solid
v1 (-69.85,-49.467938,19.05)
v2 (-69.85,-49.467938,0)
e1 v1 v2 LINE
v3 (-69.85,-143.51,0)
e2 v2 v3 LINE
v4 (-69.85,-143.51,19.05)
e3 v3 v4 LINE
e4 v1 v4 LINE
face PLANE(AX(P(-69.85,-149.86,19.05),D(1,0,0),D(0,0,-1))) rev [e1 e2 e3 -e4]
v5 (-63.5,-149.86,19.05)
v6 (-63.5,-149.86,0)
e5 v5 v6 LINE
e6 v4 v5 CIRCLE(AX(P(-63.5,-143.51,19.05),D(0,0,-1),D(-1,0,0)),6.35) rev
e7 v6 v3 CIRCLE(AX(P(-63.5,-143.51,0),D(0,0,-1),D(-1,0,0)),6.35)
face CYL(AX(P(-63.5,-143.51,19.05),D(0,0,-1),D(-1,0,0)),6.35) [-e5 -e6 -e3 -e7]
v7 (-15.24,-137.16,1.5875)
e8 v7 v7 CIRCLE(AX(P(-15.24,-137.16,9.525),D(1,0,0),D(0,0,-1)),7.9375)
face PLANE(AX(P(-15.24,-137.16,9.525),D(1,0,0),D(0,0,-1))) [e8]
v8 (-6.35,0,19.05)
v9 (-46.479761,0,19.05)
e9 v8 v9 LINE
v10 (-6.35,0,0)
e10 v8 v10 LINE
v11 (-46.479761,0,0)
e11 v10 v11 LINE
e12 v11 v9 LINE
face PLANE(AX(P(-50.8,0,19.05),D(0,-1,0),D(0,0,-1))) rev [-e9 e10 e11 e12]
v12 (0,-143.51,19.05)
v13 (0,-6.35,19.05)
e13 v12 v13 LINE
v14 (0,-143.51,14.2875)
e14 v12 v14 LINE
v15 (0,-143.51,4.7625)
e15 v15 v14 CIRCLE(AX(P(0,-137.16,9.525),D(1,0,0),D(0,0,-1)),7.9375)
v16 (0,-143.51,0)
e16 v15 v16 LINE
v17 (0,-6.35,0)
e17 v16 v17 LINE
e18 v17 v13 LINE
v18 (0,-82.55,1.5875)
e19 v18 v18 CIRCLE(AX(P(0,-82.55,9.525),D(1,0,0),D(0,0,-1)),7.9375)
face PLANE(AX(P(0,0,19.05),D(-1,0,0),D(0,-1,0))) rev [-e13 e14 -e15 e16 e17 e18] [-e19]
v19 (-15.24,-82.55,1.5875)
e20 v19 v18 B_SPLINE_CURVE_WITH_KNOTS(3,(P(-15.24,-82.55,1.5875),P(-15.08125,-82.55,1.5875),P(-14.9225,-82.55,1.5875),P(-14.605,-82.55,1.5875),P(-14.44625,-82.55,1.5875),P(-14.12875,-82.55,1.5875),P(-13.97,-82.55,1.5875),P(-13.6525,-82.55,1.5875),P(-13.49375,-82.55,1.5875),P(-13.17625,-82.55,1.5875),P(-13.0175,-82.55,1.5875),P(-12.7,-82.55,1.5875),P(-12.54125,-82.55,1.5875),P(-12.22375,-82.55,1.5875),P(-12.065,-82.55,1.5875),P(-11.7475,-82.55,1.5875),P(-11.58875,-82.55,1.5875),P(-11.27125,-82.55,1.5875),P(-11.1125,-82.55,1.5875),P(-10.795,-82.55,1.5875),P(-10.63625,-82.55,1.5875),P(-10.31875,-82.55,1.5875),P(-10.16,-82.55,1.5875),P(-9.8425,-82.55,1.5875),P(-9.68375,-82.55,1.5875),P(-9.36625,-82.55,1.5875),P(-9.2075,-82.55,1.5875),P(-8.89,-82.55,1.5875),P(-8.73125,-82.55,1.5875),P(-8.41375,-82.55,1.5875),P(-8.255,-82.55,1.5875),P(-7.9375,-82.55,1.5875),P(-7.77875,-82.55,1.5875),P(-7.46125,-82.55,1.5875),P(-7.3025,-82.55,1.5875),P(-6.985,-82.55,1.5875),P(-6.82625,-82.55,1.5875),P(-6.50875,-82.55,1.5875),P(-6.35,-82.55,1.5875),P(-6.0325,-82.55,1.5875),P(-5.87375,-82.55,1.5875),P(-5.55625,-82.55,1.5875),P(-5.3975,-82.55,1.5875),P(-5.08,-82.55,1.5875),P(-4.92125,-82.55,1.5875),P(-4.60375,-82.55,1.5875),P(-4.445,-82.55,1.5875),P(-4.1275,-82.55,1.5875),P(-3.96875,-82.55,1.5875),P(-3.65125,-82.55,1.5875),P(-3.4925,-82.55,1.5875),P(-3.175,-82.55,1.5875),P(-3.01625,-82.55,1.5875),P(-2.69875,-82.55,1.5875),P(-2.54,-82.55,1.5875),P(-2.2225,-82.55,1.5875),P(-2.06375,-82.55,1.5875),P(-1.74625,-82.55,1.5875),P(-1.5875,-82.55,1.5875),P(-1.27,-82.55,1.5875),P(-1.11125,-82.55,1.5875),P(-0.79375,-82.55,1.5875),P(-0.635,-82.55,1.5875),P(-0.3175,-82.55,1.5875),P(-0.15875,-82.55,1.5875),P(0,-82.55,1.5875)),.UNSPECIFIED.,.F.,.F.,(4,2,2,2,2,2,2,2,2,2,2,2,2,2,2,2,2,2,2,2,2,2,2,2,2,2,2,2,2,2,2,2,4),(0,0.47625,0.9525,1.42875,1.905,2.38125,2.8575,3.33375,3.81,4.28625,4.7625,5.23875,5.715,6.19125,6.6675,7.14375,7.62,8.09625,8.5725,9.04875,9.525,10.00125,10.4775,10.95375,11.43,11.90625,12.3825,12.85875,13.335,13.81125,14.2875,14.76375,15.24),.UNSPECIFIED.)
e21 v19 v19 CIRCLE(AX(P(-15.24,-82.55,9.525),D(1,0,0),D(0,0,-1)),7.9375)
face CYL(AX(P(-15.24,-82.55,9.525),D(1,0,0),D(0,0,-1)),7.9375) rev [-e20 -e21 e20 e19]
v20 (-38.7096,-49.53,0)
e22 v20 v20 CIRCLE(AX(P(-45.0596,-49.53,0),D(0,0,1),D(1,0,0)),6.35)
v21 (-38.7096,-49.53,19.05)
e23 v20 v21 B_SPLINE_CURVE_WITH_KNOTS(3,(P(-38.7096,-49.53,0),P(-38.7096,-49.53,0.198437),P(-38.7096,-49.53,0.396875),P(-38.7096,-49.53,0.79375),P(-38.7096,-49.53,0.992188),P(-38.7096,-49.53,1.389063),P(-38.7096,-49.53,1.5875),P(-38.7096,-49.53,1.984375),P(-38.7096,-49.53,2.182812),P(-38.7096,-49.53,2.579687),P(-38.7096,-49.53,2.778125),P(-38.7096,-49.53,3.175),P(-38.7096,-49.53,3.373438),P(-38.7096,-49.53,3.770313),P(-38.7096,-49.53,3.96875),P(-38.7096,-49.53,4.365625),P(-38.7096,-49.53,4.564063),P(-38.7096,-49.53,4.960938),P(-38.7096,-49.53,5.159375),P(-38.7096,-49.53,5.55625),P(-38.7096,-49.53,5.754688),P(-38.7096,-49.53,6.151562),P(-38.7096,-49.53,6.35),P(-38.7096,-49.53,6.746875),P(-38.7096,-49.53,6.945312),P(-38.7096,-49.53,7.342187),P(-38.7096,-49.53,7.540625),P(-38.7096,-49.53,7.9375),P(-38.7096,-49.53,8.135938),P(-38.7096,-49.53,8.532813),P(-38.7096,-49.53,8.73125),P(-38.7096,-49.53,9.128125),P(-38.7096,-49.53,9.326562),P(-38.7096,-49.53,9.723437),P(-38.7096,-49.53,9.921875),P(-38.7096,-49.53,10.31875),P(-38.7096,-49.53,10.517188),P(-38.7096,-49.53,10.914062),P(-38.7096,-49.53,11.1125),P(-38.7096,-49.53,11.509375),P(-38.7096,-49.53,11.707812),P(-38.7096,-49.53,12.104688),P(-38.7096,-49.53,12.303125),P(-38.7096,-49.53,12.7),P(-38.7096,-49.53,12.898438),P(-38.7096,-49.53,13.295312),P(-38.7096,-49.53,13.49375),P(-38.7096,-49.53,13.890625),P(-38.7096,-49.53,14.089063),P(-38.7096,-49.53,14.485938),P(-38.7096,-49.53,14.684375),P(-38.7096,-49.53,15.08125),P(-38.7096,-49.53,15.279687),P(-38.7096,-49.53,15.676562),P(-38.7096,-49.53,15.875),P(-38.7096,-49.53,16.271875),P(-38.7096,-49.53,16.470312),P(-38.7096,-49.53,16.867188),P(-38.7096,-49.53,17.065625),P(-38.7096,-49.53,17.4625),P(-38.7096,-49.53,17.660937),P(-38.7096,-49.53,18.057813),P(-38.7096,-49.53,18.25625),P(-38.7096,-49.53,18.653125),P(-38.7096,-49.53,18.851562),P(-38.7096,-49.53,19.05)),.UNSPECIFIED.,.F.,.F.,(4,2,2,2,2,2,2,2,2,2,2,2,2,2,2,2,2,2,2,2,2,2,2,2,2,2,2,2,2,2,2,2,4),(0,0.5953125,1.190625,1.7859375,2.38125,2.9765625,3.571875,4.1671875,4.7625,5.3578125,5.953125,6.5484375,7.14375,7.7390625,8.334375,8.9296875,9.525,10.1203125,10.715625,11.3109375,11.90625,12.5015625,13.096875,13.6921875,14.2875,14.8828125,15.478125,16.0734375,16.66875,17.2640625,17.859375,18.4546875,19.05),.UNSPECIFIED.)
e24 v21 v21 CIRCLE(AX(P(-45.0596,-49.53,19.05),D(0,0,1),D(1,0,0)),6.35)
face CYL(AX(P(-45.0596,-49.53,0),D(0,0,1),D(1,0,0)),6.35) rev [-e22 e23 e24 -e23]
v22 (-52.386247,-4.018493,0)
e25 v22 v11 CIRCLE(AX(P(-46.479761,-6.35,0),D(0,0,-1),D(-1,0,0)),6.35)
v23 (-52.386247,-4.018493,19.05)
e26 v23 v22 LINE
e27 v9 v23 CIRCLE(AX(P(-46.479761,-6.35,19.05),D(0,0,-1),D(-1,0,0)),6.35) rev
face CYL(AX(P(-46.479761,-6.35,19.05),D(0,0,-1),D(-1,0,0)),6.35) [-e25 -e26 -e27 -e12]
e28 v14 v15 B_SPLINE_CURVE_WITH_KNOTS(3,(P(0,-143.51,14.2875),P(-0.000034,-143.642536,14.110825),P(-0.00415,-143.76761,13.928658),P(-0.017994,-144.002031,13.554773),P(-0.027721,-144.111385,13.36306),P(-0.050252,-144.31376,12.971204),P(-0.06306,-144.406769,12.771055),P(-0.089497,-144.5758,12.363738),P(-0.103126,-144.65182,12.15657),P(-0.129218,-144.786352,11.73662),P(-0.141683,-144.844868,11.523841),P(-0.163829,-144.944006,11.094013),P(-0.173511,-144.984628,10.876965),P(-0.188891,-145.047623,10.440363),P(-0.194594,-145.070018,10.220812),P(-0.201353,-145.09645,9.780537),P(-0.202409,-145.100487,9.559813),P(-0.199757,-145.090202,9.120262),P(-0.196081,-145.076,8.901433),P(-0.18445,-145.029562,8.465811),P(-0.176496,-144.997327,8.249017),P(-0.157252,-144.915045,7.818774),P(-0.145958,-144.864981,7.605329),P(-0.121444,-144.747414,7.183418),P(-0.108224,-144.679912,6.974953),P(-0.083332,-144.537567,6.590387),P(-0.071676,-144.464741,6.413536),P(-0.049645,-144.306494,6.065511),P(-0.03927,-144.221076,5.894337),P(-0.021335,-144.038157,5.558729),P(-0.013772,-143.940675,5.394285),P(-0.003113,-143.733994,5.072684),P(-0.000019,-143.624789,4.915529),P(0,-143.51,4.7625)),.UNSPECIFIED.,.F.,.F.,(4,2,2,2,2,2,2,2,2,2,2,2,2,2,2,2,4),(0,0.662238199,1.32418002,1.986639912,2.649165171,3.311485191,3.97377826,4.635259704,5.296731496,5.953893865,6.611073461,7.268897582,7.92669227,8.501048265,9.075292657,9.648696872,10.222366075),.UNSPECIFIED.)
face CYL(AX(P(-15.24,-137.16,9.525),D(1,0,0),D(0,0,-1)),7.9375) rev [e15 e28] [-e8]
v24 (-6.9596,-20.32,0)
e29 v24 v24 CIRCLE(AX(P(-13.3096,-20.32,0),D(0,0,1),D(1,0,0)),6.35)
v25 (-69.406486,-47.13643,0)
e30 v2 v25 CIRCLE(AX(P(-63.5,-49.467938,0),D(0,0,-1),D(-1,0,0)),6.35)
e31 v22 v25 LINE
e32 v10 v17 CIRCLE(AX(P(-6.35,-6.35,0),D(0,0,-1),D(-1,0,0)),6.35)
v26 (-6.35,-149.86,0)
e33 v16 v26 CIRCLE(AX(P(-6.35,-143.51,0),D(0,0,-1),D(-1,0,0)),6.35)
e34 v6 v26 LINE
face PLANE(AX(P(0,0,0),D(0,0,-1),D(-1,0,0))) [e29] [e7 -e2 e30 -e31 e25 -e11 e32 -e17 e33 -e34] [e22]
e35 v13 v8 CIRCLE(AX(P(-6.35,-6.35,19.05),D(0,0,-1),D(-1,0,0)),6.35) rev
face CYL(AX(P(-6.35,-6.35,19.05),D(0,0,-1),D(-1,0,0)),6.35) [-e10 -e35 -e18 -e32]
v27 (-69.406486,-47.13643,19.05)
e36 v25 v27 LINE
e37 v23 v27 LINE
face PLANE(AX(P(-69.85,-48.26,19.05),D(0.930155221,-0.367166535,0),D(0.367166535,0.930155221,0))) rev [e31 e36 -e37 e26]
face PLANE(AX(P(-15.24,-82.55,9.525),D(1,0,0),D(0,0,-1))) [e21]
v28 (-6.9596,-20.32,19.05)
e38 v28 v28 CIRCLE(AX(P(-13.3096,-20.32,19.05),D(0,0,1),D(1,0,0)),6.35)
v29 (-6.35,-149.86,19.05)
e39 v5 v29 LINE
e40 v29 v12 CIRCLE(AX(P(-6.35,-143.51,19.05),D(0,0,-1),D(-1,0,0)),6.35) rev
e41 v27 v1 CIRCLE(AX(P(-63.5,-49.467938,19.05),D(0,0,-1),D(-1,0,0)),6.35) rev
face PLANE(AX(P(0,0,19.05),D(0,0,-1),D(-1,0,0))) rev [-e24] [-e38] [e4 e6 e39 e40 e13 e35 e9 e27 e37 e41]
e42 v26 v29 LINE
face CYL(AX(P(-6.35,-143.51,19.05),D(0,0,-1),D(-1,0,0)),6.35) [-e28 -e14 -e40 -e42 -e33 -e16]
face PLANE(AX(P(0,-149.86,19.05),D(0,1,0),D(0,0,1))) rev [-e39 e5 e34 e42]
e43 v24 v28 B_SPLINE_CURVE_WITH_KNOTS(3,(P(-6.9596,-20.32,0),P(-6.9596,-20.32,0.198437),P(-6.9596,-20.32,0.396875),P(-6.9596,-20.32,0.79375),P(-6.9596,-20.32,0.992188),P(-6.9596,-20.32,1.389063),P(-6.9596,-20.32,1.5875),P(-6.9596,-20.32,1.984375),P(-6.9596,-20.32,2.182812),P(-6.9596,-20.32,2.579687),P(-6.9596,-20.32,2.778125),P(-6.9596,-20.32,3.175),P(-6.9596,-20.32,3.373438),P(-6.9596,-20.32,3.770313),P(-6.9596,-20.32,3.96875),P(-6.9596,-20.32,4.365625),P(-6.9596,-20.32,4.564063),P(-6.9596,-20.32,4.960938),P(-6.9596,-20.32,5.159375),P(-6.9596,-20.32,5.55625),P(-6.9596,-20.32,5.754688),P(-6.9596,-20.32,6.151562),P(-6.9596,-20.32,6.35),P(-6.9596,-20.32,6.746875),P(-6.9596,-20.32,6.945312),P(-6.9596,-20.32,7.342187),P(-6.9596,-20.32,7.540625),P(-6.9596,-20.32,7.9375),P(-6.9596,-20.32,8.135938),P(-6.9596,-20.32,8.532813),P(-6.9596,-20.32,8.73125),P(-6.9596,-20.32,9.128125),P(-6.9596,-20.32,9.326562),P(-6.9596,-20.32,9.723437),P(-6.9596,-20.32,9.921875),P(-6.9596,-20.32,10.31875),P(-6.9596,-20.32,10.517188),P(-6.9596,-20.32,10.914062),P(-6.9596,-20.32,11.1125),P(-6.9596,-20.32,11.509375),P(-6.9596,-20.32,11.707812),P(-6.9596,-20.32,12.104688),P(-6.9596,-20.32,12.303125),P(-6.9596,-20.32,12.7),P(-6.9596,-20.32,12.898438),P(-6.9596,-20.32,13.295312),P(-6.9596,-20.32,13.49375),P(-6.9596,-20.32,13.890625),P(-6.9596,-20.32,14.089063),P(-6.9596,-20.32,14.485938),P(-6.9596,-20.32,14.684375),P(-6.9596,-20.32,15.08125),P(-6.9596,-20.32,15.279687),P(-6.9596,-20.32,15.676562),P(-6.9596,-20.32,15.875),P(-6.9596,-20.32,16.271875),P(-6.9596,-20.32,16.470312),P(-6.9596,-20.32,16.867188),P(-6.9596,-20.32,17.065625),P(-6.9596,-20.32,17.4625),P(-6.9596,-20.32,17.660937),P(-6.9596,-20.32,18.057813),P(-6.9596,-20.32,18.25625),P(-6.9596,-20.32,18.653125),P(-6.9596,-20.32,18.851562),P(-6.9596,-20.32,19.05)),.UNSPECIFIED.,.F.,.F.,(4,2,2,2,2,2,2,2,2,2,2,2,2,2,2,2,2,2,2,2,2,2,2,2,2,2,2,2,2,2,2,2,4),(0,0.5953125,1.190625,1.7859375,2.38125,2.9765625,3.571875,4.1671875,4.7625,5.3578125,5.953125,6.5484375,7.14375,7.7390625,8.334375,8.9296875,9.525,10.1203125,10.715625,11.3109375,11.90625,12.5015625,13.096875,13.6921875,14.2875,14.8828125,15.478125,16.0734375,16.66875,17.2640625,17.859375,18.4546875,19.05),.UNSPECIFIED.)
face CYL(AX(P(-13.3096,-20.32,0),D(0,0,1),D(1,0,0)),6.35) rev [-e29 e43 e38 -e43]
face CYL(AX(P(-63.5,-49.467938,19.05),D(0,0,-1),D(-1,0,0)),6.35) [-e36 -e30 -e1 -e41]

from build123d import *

# Parameters (mm, degrees)
BOSS_EXTRUDE1_DEPTH = 19.05
SKETCH2_R           = 7.9375
CUT_EXTRUDE1_DEPTH  = 15.24
SKETCH3_R           = 6.35
CUT_EXTRUDE3_DEPTH  = 167.433003338
FILLET1_R           = 6.35


with BuildPart() as part:
    # Sketch1 → Boss-Extrude1 (new body)
    with BuildSketch(Plane.XY):
        Polygon((0, 0), (0, -149.86), (-69.85, -149.86), (-69.85, -48.26), (-50.8, 0), align=None)
    extrude(amount=BOSS_EXTRUDE1_DEPTH)

    # Sketch2 → Cut-Extrude1 (cut)
    with BuildSketch(Plane(origin=(0, 0, 0), x_dir=(0, 0, -1), z_dir=(1, 0, 0))):
        with Locations((-9.525, -82.55)):
            Circle(SKETCH2_R)
        with Locations((-9.525, -137.16)):
            Circle(SKETCH2_R)
    extrude(amount=-CUT_EXTRUDE1_DEPTH, mode=Mode.SUBTRACT)

    # Sketch3 → Cut-Extrude3 (cut, through all)
    with BuildSketch(Plane.XY.offset(19.05)):
        with Locations((-45.0596, -49.53)):
            Circle(SKETCH3_R)
        with Locations((-13.3096, -20.32)):
            Circle(SKETCH3_R)
    extrude(amount=-CUT_EXTRUDE3_DEPTH, mode=Mode.SUBTRACT)

    # Fillet1
    # the kernel refuses this fillet: 6.35 mm, written as the material it takes off along each edge
    with BuildSketch(Plane(origin=(0, 0, -15.875), x_dir=(0, -1, 0), z_dir=(0, 0, 1))) as fillet1_piece_1:
        with BuildLine():
            CenterArc((FILLET1_R, -FILLET1_R), FILLET1_R, 90, 90)
            Line((0, -FILLET1_R), (0, 0))
            Line((0, 0), (FILLET1_R, 0))
        make_face()
    extrude(amount=50.8, mode=Mode.SUBTRACT)
    with BuildSketch(Plane(origin=(0, -149.86, -15.875), x_dir=(0, 1, 0), z_dir=(0, 0, 1)), Plane(origin=(-69.85, -149.86, -15.875), x_dir=(1, 0, 0), z_dir=(0, 0, 1))) as fillet1_piece_2:
        with BuildLine():
            CenterArc((FILLET1_R, FILLET1_R), FILLET1_R, 180, 90)
            Line((0, FILLET1_R), (0, 0))
            Line((0, 0), (FILLET1_R, 0))
        make_face()
    extrude(amount=50.8, mode=Mode.SUBTRACT)
    with BuildSketch(Plane(origin=(-69.85, -48.26, -3.019844557), x_dir=(0.367166534736053, 0.9301552213313209, 0), z_dir=(0, 0, 1))) as fillet1_piece_3:
        with BuildLine():
            CenterArc((FILLET1_R * 0.190226428775, -FILLET1_R), FILLET1_R, 90, 21.540975919)
            Line((-FILLET1_R * 0.176940105961, -FILLET1_R * 0.0698447786687), (0, 0))
            Line((0, 0), (FILLET1_R * 0.190226428775, 0))
        make_face()
    extrude(amount=25.089689114, mode=Mode.SUBTRACT)
    with BuildSketch(Plane(origin=(-50.8, 0, -10.800596536), x_dir=(1, 0, 0), z_dir=(0, 0, 1))) as fillet1_piece_4:
        with BuildLine():
            CenterArc((FILLET1_R * 0.680352537675, -FILLET1_R), FILLET1_R, 90, 68.459024081)
            Line((-FILLET1_R * 0.249802683657, -FILLET1_R * 0.632833465264), (0, 0))
            Line((0, 0), (FILLET1_R * 0.680352537675, 0))
        make_face()
    extrude(amount=40.651193071, mode=Mode.SUBTRACT)


solid = part.part
